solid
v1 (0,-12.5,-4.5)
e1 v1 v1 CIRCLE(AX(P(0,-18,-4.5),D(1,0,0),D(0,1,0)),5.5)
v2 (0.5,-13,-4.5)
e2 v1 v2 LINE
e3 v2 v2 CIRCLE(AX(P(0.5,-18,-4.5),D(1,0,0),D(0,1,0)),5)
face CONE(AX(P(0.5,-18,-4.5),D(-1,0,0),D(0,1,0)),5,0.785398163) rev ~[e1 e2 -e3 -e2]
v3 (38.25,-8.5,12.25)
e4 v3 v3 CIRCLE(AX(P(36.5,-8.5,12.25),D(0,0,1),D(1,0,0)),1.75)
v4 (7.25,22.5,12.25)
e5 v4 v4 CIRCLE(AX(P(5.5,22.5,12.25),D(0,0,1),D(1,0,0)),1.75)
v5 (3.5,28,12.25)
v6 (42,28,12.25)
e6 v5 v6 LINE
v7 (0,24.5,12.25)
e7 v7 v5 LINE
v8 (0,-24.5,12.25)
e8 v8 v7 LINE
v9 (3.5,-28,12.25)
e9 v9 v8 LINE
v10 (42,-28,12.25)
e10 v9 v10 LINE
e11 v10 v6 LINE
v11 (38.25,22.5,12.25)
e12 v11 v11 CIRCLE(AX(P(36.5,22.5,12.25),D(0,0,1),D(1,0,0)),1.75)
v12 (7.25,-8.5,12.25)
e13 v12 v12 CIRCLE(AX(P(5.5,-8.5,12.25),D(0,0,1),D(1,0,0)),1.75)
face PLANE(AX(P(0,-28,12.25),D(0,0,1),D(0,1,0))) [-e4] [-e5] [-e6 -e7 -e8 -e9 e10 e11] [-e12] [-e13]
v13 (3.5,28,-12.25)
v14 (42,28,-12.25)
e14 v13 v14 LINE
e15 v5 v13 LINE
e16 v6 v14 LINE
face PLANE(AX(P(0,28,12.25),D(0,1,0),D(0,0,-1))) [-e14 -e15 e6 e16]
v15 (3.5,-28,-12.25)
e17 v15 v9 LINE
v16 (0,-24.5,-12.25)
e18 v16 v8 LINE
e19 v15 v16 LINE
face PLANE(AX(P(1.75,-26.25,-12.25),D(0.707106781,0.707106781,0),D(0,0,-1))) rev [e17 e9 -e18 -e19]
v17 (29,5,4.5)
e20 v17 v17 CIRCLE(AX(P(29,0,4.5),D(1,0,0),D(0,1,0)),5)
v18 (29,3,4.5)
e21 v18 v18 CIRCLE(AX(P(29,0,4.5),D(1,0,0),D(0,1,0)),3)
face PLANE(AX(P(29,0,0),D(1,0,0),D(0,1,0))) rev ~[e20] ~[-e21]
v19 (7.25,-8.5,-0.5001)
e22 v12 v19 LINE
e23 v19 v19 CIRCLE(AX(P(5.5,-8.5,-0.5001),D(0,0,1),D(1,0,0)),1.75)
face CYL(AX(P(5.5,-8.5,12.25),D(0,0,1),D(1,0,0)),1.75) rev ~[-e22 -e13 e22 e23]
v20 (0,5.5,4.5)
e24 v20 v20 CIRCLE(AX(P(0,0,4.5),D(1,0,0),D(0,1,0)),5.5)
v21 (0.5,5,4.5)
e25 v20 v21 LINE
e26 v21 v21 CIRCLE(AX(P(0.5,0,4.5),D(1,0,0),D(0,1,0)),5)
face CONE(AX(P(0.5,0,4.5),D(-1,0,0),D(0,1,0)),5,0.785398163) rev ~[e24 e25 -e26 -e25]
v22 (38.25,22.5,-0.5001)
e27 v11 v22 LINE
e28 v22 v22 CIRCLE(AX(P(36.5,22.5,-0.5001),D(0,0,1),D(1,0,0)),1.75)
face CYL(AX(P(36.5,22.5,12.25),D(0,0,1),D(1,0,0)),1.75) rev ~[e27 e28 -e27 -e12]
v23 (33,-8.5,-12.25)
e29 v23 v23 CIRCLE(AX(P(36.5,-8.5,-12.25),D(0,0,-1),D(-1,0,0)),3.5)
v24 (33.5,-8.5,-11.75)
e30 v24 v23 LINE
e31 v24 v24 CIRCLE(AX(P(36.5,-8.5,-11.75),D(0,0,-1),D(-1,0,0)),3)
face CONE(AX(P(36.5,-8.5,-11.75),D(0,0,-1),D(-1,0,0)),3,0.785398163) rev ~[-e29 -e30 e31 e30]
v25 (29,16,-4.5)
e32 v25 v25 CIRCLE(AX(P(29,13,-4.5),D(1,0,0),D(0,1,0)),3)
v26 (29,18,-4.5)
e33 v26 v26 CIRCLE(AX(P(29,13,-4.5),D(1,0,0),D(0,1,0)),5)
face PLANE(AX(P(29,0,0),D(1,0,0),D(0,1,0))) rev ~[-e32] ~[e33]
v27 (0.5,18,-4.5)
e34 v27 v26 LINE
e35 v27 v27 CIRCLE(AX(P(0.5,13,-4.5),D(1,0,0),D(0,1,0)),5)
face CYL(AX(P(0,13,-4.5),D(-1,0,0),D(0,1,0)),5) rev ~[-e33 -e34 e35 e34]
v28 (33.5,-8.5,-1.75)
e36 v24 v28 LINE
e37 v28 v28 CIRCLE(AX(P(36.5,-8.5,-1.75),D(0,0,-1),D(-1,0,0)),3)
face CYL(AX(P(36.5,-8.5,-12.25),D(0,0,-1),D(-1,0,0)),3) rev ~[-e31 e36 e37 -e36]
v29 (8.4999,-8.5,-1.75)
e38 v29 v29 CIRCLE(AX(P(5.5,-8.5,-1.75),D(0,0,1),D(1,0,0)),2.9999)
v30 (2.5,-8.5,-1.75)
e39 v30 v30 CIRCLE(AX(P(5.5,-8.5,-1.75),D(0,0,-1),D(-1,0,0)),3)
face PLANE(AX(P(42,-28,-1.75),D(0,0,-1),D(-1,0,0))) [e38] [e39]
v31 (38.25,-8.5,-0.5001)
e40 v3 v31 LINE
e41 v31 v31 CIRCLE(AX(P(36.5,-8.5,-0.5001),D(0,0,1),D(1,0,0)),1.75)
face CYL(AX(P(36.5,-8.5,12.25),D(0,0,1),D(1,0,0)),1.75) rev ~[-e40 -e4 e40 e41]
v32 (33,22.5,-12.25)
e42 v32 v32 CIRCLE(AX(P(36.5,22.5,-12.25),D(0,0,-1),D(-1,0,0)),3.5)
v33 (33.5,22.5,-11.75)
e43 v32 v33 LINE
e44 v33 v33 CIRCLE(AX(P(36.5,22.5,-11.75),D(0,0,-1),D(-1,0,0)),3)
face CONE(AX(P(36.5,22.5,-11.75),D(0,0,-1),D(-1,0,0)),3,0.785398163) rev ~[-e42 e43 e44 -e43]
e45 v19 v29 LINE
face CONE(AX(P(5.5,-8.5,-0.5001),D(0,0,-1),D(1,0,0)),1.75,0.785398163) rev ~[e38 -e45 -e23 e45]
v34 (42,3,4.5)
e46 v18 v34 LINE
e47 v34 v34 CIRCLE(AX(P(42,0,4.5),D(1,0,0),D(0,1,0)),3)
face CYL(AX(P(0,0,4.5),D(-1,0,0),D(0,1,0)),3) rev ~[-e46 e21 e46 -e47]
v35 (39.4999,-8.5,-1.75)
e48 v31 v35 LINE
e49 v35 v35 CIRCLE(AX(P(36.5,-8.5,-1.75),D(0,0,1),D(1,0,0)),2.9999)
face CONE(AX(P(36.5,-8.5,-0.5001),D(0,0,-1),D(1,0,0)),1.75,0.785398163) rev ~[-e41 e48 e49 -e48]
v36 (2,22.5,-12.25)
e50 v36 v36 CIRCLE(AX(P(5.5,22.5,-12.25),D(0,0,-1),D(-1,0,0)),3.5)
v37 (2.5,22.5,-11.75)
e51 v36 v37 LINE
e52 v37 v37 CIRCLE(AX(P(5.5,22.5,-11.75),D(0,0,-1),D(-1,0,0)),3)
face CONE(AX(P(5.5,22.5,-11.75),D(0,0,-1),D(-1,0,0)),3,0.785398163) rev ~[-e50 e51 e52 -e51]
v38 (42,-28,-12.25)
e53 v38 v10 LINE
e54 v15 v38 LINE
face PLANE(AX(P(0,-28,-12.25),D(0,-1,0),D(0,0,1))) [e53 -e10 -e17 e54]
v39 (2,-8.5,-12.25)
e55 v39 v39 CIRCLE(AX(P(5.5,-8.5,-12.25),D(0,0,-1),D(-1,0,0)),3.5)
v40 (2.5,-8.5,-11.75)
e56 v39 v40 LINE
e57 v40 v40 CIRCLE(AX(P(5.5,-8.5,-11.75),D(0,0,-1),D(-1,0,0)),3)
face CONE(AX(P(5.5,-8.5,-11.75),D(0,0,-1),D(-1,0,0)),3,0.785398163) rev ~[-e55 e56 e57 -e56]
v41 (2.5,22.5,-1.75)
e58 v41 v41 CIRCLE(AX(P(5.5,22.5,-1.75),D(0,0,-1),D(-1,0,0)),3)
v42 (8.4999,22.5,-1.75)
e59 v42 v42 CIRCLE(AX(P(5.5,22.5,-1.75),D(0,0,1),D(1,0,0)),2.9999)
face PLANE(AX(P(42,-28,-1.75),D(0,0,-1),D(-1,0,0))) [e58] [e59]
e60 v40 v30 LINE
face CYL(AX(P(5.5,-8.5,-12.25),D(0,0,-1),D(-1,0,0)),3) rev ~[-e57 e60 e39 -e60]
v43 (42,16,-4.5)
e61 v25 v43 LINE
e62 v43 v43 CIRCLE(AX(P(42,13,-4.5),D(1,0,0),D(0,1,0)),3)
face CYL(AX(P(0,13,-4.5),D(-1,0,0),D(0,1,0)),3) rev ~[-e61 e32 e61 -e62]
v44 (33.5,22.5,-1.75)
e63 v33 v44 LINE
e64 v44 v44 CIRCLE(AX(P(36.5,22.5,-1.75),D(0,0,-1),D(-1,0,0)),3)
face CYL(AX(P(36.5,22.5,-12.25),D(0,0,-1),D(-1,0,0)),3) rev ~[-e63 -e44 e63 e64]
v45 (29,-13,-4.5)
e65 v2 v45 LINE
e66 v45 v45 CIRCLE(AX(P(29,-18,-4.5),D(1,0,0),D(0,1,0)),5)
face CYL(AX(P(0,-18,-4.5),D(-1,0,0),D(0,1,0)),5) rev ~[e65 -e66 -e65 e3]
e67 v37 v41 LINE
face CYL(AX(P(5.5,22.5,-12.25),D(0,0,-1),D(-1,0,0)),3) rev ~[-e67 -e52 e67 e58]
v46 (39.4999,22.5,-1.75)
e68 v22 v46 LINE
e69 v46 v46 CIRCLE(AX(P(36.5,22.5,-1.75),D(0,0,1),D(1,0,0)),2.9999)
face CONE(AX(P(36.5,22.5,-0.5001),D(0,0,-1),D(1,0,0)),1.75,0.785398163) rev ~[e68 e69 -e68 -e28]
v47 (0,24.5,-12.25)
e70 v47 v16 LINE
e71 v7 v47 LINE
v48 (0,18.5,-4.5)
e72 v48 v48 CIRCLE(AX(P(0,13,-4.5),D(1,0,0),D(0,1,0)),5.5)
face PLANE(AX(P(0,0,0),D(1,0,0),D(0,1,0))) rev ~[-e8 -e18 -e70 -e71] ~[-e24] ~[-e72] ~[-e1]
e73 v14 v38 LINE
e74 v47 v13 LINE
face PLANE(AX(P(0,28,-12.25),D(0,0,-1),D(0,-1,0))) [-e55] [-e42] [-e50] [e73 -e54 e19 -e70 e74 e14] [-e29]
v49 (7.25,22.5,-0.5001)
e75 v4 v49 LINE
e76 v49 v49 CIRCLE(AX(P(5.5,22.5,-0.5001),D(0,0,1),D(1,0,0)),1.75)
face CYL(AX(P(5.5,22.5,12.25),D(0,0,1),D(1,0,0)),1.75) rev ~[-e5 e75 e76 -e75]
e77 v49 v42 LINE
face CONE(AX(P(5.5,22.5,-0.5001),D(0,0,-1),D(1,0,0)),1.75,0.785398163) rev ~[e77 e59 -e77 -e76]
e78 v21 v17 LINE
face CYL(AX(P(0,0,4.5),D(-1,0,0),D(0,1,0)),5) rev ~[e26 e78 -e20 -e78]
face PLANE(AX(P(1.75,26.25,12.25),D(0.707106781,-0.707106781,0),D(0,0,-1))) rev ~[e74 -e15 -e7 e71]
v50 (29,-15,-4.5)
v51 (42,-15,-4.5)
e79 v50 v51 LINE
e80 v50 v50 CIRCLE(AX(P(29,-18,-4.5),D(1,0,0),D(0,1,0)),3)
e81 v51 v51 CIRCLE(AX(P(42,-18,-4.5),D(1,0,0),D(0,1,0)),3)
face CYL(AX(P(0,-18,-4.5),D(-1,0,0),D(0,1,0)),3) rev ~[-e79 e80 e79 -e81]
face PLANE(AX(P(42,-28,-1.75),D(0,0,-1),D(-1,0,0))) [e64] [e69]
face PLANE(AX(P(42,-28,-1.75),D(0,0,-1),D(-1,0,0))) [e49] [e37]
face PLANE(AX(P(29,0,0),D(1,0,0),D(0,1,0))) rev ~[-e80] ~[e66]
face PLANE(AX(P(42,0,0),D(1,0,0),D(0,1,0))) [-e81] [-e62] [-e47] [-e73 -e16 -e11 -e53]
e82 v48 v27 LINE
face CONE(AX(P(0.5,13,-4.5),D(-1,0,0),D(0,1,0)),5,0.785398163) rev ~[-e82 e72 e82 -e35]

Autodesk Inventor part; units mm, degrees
ref_plane "YZ Plane" through (0, 0, 0) normal (1, 0, 0) x (0, 1, 0)
ref_plane "XZ Plane" through (0, 0, 0) normal (0, 1, 0) x (-1, 0, 0)
ref_plane "XY Plane" through (0, 0, 0) normal (0, 0, 1) x (1, 0, 0)
sketch "Sketch1" plane through (0, 0, 0) normal (1, 0, 0) x (0, 1, 0)
  line L0 (-28, 12.25) -> (28, 12.25)
  line L1 (28, 12.25) -> (28, -12.25)
  line L2 (28, -12.25) -> (-28, -12.25)
  line L3 (-28, -12.25) -> (-28, 12.25)
  line L4 (-28, 12.25) -> (28, -12.25) construction
  line L5 (28, 12.25) -> (-28, -12.25) construction
  circle A0 centre (13, -4.5) radius 5
  circle A1 centre (0, 4.5) radius 5
  circle A2 centre (-18, -4.5) radius 5
  circle A3 centre (13, -4.5) radius 3
  circle A4 centre (0, 4.5) radius 3
  circle A5 centre (-18, -4.5) radius 3
  point P0 (0, 0)
  dimension "d2" = 56
  dimension "d3" = 24.5
  dimension "d4" = 10
  dimension "d5" = 4.5
  dimension "d6" = 4.5
  dimension "d7" = 15
  dimension "d8" = 6
  dimension "d27" = 10
extrude "Extrusion1" add sketch "Sketch1" along normal blind 42 contours L0 L1 L2 L3 | A0 | A1 | A2
extrude "Extrusion2" cut sketch "Sketch1" along normal blind 29 contours A0 | A1 | A2
sketch "Sketch2" plane through (0, -28, 12.25) normal (0, 0, 1) x (1, 0, 0)
  circle A0 centre (5.5, 50.5) radius 1.75
  circle A1 centre (36.5, 50.5) radius 1.75
  circle A2 centre (36.5, 19.5) radius 1.75
  circle A3 centre (5.5, 19.5) radius 1.75
  line L0 (0, 56) -> (42, 56) projected
  line L1 (0, 56) -> (0, 0) projected
  circle A4 centre (36.5, 50.5) radius 3
  circle A5 centre (5.5, 50.5) radius 3
  circle A6 centre (5.5, 19.5) radius 3
  circle A7 centre (36.5, 19.5) radius 3
  point P0 (0, 28)
  dimension "d11" = 5.5
  dimension "d12" = 5.5
  dimension "d13" = 31
  dimension "d14" = 31
  dimension "d15" = 3.5
  dimension "d21" = 6
extrude "Extrusion3" cut sketch "Sketch2" against normal blind 28.75 contours A0 | A1 | A2 | A3
chamfer "Chamfer1" distance 3.5 angle 45 2 edges at (0, 28, 0) (0, -28, 0)
sketch "Sketch3" plane through (42, -28, -12.25) normal (0, 0, -1) x (-1, 0, 0)
  circle A0 centre (5.5, 50.5) radius 3 projected
  circle A1 centre (36.5, 50.5) radius 3 projected
  circle A2 centre (36.5, 19.5) radius 3 projected
  circle A3 centre (5.5, 19.5) radius 3 projected
  point P0 (42, 28)
extrude "Extrusion4" cut sketch "Sketch3" against normal blind 10.5
chamfer "Chamfer2" distance 1.25 angle 45 4 edges at (34.75, 22.5, -1.75) (3.75, 22.5, -1.75) (3.75, -8.5, -1.75) (34.75, -8.5, -1.75)
chamfer "Chamfer3" distance 0.5 angle 45 7 edges at (39.5, 22.5, -12.25) (8.5, 22.5, -12.25) (0, 8, -4.5) (0, -5, 4.5) (0, -23, -4.5) (8.5, -8.5, -12.25) (39.5, -8.5, -12.25)
properties part number "ZaxisMotorMount_3DPrint"
